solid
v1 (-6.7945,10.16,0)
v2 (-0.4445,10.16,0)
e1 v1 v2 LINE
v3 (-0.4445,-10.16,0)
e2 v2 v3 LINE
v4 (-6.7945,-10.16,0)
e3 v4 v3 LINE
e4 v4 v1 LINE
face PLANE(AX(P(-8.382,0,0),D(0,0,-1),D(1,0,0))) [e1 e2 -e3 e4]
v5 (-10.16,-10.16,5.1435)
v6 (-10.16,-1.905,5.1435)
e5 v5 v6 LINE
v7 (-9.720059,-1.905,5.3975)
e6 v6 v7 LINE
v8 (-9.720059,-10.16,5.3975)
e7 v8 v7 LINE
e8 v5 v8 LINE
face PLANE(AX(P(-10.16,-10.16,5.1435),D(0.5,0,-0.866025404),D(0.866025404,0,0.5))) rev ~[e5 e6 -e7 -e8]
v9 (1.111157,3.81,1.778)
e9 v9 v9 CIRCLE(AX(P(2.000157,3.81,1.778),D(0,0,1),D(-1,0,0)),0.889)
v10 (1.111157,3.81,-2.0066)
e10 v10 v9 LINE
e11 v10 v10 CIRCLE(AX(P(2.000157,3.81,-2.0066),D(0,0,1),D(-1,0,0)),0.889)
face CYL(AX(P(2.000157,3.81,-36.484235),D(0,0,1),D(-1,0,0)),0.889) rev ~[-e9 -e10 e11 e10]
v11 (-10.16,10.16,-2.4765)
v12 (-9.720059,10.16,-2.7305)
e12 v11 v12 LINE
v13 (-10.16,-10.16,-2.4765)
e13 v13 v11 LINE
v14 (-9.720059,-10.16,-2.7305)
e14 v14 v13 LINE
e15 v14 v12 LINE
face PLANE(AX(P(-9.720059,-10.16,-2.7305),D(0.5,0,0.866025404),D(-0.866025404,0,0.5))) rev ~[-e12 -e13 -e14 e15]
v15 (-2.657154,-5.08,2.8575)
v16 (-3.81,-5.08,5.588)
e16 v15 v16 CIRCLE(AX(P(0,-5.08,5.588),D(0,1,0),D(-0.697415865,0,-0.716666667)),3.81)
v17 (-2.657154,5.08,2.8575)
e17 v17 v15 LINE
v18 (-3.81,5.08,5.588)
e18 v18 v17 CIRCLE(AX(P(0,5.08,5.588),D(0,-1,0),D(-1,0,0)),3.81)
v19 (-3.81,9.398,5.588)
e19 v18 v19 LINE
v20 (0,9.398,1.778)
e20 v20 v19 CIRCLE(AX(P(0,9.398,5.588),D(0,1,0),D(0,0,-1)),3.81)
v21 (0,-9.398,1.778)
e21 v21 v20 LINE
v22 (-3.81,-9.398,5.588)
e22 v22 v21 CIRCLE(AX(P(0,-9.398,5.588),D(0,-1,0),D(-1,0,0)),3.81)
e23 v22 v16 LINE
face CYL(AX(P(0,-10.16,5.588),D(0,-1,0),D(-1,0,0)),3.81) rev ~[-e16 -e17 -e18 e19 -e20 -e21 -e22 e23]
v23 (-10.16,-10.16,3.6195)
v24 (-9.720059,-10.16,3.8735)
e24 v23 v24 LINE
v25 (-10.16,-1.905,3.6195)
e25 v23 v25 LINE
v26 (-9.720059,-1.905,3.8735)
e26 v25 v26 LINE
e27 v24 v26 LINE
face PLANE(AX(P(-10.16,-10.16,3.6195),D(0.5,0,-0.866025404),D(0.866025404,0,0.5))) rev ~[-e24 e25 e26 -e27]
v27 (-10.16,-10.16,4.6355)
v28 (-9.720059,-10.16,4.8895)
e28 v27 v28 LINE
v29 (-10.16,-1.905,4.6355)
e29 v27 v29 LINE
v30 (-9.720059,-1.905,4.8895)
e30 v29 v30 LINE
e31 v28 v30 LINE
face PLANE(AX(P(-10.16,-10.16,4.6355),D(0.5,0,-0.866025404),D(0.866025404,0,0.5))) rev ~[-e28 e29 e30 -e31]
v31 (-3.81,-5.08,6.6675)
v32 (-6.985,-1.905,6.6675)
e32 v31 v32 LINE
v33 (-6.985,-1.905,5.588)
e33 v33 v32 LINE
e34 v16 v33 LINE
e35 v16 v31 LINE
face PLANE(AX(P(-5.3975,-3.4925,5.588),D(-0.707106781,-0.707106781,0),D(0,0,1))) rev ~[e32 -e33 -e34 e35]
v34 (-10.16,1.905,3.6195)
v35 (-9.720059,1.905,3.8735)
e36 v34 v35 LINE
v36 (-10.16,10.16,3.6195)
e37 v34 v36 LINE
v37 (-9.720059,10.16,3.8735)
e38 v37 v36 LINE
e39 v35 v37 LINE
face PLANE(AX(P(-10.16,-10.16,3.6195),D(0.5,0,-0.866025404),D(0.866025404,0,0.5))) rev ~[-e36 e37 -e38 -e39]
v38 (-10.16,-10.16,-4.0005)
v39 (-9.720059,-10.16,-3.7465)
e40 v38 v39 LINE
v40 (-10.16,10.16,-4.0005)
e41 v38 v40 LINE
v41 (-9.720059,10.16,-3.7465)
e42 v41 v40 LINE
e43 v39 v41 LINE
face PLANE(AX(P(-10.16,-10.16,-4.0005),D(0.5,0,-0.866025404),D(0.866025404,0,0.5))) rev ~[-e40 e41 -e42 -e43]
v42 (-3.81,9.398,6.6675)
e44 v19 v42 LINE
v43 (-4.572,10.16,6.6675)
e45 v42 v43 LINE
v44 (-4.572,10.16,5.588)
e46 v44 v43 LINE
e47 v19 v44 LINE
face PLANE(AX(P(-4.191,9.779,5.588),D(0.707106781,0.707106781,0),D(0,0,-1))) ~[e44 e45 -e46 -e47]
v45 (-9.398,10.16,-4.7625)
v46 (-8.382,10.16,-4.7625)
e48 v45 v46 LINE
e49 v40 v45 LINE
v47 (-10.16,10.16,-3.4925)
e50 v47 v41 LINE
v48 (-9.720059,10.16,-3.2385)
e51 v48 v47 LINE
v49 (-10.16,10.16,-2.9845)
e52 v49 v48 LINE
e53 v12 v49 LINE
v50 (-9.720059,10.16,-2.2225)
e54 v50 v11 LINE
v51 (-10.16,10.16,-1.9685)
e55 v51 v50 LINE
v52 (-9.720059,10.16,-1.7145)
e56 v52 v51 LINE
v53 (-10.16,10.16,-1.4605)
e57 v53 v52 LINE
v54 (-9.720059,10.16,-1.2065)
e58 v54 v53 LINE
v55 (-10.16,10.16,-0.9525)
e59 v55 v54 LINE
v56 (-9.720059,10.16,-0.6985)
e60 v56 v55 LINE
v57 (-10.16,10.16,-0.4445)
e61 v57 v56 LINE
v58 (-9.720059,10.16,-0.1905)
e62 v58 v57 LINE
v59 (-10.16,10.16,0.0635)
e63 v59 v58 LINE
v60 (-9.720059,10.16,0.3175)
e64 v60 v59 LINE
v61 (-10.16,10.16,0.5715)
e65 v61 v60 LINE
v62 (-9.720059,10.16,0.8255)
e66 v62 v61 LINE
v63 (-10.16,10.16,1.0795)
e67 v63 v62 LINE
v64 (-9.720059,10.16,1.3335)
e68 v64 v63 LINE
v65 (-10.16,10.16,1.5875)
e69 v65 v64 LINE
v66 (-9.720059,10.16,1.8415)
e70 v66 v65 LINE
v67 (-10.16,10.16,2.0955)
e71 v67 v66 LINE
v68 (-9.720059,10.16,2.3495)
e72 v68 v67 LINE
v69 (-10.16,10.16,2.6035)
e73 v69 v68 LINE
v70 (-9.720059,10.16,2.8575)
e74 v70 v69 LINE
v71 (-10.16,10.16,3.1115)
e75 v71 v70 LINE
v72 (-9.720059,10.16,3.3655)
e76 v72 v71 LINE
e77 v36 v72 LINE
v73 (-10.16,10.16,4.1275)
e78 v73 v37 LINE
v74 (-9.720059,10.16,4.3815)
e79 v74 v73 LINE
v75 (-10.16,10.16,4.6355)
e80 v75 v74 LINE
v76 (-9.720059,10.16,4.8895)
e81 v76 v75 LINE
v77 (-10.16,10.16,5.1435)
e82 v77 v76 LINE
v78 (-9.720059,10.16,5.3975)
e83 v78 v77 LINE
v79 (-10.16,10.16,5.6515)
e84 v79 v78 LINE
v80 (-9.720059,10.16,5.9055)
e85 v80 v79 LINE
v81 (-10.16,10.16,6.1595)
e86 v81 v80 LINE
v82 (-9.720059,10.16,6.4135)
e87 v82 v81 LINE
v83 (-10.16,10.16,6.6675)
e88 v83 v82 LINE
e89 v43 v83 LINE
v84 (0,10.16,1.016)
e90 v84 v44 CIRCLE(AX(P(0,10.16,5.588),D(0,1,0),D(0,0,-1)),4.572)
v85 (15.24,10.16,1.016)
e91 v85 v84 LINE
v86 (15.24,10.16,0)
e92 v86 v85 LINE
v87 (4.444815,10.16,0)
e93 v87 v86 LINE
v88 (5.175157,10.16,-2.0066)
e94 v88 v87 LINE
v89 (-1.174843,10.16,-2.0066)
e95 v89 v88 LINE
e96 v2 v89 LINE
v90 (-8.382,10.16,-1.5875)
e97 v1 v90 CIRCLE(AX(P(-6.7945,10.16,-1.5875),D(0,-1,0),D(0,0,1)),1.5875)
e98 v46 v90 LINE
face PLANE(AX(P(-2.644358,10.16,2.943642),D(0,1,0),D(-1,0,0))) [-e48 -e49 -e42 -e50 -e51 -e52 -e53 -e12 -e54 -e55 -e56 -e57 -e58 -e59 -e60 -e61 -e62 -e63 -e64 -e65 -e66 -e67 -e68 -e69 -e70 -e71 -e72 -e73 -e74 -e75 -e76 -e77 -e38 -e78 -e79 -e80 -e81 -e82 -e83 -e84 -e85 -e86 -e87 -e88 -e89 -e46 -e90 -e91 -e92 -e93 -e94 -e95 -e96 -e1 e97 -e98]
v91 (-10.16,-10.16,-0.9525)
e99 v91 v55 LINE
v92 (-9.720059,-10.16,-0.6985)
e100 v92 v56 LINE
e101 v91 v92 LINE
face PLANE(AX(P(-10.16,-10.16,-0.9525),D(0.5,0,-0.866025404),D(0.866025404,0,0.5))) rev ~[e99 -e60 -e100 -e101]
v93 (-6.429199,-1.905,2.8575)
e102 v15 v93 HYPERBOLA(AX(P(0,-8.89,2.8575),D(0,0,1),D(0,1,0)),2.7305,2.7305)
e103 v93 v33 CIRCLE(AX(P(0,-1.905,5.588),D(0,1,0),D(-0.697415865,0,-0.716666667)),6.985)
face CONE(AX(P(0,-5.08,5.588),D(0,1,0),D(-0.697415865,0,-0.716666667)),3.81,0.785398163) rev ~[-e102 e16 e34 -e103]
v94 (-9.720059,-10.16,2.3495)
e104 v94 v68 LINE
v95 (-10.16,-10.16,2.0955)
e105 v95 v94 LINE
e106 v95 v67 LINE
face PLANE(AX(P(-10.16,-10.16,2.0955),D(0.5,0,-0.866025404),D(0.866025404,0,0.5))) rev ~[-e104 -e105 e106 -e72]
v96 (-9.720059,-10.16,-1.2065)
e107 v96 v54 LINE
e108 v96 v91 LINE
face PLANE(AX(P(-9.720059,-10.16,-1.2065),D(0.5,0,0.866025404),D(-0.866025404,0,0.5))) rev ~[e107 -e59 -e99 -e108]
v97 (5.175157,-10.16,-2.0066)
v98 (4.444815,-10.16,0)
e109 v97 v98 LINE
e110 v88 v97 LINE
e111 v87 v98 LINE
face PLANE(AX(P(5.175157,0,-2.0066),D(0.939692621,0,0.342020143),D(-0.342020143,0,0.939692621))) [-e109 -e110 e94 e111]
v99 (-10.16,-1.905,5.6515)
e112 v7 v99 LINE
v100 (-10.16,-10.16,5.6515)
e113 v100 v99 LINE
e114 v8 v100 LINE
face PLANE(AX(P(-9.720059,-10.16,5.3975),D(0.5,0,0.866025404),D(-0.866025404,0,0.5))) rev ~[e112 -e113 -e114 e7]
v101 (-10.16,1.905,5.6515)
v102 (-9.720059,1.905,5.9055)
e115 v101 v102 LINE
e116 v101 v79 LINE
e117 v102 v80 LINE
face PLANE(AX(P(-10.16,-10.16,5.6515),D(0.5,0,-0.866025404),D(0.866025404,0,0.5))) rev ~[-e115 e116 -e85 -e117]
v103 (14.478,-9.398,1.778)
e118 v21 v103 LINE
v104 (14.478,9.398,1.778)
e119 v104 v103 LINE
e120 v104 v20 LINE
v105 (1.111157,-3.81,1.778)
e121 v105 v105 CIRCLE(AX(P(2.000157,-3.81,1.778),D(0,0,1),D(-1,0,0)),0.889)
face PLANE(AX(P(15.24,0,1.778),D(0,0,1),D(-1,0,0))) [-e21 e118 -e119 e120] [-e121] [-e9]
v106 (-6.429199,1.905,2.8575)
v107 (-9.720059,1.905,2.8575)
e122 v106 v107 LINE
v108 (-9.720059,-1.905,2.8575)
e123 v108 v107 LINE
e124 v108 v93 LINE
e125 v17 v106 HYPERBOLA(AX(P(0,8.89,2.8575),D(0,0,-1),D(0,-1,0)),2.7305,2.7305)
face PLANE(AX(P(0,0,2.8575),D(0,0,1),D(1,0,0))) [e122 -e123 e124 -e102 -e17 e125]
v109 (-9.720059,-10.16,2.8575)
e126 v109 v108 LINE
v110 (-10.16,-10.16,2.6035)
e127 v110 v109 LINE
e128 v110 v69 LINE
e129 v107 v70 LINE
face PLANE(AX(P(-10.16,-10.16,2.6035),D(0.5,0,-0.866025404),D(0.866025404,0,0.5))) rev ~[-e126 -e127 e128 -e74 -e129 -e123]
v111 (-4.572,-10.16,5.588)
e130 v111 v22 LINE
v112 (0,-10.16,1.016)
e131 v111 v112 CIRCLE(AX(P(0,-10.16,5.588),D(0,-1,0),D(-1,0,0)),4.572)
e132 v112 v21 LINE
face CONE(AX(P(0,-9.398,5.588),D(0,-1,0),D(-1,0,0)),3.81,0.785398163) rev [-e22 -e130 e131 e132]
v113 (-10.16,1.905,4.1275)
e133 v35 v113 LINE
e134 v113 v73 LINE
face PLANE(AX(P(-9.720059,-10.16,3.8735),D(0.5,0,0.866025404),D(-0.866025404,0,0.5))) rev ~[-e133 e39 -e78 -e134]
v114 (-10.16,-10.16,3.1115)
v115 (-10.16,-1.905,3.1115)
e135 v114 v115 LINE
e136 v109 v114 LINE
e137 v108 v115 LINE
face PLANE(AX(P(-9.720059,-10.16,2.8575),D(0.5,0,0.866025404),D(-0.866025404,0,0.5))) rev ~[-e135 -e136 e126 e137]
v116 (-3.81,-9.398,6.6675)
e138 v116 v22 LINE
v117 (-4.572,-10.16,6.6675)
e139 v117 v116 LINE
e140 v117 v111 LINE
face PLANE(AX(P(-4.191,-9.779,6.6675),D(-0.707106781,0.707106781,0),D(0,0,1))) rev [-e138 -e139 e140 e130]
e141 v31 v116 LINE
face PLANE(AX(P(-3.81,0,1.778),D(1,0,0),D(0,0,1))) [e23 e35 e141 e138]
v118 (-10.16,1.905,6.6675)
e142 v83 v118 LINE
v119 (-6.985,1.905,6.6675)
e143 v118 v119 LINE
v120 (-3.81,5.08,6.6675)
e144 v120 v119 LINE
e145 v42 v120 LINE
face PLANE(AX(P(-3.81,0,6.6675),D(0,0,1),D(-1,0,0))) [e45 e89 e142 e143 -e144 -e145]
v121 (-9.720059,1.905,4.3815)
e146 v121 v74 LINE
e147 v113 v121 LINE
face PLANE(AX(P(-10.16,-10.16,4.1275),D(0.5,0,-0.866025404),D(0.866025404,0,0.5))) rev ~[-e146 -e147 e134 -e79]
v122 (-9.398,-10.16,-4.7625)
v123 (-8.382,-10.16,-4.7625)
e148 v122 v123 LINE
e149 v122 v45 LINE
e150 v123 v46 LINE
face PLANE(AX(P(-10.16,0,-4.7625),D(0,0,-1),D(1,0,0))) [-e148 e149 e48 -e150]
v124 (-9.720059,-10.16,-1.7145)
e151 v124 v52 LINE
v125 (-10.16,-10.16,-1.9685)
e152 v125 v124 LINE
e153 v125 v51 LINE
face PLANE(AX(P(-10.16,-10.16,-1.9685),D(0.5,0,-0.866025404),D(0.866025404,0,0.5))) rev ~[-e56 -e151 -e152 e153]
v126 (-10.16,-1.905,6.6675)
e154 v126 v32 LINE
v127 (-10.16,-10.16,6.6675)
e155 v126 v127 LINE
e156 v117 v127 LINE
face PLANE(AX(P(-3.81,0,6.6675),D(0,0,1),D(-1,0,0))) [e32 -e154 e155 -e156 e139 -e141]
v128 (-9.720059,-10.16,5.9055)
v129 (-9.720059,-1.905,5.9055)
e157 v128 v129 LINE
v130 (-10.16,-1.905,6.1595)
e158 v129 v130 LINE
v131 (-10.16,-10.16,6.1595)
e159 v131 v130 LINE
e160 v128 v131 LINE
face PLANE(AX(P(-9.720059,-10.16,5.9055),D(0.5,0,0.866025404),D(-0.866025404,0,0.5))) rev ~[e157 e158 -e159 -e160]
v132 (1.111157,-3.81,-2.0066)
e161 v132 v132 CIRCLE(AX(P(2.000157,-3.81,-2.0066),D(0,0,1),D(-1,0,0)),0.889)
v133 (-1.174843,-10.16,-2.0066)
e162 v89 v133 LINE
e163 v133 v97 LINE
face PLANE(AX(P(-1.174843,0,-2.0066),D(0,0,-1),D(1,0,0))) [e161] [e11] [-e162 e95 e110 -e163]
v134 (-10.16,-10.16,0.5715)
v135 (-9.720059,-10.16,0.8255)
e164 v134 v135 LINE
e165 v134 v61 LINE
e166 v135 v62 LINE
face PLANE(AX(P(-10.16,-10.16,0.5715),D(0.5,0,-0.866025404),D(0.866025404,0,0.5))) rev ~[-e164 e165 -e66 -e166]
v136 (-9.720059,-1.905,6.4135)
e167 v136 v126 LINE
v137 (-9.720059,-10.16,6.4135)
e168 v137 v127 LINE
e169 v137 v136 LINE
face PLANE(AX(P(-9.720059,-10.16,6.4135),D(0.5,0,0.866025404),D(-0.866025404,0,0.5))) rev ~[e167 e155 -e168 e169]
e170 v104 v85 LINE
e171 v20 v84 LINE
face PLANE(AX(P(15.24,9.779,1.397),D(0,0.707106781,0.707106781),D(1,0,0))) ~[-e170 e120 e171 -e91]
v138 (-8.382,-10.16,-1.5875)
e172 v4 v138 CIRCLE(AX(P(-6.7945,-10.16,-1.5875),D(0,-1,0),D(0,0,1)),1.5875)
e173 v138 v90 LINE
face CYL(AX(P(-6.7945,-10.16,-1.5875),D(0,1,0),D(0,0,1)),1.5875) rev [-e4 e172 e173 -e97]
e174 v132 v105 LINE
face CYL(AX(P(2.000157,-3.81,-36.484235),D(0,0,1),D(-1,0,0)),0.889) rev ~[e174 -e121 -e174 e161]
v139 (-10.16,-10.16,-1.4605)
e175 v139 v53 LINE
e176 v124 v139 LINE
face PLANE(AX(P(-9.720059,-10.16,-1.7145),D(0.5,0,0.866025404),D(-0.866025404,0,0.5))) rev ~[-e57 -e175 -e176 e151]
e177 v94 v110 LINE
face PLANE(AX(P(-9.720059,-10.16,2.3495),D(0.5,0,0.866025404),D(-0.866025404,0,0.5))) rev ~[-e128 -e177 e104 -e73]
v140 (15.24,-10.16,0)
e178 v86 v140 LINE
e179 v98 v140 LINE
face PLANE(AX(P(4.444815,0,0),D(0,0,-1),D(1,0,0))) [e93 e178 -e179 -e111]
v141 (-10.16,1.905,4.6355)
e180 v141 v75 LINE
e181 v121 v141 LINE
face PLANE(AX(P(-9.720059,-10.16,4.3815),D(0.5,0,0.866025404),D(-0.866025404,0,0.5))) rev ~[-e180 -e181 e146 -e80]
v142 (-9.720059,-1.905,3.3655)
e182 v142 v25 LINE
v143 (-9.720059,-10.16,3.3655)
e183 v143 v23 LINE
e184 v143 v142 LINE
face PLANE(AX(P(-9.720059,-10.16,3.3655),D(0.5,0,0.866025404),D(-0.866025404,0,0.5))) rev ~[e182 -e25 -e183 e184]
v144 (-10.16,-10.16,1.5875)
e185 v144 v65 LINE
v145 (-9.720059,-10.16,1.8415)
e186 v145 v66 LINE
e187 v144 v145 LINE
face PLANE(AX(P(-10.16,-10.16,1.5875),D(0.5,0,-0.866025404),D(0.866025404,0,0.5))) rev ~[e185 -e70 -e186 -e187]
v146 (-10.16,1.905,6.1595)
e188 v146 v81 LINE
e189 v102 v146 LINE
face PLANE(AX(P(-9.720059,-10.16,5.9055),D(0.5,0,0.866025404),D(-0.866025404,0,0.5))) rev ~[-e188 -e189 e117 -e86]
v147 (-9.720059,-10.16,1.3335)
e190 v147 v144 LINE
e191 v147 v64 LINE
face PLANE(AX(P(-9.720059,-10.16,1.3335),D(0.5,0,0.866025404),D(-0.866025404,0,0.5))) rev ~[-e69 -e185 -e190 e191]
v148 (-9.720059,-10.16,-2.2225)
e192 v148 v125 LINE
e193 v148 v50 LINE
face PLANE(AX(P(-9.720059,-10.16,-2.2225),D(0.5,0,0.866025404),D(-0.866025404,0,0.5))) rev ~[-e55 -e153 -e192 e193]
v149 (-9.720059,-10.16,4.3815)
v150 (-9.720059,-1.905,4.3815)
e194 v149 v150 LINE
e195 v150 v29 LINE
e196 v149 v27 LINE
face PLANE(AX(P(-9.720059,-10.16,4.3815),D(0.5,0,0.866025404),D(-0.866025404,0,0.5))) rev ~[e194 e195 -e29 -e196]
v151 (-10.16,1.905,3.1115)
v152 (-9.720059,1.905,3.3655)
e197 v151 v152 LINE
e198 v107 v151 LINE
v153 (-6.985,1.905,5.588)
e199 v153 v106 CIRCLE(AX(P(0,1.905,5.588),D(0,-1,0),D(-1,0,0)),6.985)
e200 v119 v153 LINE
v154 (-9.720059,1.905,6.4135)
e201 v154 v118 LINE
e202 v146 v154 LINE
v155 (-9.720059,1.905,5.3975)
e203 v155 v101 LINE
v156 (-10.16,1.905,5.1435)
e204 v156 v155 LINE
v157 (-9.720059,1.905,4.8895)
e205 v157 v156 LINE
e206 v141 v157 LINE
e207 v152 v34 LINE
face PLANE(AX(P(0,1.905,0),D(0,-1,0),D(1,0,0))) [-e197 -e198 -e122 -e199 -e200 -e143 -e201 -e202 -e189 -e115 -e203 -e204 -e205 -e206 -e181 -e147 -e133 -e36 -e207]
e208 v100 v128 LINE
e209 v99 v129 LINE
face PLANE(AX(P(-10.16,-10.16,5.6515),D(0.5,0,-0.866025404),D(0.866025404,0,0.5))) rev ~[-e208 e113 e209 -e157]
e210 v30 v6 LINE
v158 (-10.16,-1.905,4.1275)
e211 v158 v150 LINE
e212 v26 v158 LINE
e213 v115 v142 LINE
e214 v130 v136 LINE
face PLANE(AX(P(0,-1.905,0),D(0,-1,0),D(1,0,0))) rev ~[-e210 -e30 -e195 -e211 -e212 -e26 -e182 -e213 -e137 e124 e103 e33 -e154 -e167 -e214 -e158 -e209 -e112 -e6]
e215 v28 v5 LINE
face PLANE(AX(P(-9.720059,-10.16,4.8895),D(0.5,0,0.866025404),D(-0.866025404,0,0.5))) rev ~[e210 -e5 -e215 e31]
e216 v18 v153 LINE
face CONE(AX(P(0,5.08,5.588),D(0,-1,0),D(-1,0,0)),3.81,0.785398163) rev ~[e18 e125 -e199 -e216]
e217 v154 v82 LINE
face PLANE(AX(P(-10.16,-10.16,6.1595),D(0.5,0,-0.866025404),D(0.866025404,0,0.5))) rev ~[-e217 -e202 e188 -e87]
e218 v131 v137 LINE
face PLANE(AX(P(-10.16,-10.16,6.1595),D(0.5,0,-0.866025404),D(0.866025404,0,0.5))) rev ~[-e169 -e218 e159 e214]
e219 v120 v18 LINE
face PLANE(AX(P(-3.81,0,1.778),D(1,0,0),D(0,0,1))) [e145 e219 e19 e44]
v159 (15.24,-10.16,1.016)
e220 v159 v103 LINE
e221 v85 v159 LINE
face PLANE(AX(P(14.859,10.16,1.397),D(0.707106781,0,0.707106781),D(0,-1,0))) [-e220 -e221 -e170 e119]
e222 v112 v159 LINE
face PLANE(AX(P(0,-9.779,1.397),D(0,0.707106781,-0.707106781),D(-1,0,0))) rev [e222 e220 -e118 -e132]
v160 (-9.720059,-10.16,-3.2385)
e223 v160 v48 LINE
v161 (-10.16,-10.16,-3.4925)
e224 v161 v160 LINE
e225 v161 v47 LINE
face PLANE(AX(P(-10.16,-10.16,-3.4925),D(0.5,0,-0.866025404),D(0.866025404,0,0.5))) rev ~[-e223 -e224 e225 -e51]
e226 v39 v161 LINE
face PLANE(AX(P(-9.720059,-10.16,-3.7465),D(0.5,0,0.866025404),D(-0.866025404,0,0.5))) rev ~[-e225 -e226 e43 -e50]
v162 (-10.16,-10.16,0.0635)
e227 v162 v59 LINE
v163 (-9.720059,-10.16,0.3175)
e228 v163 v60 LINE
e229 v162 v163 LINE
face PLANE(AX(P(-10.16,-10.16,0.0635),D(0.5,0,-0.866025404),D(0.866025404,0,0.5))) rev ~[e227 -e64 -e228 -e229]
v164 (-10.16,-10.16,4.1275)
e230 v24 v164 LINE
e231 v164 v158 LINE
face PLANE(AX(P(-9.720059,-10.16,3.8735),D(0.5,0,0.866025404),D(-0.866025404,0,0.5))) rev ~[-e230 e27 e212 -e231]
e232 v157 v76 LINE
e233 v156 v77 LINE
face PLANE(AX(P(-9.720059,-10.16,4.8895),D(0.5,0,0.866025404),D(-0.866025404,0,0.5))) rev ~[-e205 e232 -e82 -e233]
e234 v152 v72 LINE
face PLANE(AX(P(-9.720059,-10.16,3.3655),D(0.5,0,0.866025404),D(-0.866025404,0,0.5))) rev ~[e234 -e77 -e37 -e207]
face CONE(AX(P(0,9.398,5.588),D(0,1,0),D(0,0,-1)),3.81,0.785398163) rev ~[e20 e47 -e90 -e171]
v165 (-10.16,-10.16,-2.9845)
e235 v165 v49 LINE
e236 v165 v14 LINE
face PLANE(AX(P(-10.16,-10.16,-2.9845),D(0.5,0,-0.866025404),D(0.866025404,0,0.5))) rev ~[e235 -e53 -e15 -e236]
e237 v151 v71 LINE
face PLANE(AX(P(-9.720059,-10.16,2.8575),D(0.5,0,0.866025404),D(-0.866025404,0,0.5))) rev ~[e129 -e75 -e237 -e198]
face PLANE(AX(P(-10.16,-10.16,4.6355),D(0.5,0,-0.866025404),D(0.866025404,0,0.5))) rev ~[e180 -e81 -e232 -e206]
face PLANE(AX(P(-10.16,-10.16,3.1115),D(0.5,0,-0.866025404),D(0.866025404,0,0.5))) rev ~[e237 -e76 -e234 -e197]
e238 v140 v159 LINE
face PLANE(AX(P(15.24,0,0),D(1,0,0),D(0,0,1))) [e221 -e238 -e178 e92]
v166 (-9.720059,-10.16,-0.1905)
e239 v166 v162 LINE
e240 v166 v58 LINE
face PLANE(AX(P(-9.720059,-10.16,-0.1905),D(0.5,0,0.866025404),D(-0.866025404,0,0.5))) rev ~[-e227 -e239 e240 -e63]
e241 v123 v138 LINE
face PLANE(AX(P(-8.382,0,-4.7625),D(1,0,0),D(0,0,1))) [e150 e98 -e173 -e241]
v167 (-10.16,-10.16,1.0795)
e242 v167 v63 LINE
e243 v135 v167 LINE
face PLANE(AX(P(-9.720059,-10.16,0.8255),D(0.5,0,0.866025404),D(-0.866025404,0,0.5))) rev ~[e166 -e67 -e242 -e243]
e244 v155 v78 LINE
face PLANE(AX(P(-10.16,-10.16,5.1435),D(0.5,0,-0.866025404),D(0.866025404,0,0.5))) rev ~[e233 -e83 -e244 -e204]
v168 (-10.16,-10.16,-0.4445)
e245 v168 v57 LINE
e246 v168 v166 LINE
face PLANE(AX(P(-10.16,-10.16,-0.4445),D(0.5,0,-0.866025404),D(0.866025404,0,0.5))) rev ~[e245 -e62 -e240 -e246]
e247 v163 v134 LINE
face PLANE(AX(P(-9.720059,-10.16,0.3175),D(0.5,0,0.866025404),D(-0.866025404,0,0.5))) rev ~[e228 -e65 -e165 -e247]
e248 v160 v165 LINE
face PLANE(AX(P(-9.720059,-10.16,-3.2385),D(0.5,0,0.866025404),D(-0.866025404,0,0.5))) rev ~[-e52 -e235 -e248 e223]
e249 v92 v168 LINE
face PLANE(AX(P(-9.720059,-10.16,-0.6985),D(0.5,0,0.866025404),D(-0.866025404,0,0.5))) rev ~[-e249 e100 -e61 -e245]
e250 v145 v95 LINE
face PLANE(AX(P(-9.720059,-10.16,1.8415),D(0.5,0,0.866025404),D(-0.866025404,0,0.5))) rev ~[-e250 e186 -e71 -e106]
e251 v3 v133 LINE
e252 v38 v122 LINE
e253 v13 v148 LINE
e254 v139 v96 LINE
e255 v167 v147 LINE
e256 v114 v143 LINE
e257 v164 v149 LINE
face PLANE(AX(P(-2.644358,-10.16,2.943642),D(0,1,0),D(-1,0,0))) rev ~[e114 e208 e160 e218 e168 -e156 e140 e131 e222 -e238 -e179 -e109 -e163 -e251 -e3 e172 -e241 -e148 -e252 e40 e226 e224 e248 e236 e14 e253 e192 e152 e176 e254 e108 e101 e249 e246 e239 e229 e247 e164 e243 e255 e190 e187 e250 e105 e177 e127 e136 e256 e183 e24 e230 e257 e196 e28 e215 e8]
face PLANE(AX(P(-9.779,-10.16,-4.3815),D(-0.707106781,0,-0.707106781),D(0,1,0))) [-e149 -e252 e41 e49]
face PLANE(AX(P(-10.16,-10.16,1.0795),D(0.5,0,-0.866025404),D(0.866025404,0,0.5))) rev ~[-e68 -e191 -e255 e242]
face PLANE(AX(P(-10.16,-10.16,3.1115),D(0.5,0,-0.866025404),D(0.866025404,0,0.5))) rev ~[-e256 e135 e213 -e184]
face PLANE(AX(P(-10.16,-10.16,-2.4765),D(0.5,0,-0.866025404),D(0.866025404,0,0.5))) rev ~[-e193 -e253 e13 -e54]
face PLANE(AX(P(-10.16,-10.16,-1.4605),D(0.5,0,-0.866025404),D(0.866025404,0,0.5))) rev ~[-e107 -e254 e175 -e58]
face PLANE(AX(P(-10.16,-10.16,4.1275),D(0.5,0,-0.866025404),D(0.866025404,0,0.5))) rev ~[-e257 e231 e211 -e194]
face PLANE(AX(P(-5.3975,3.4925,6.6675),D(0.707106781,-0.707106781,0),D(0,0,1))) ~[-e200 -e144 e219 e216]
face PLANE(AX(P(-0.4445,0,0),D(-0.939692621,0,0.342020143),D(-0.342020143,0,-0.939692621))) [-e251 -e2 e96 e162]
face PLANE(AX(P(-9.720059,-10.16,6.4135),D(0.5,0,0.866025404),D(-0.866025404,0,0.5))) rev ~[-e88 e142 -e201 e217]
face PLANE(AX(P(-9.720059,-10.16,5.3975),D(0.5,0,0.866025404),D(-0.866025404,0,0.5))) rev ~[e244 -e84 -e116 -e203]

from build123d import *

# Parameters (mm, degrees)
F1_DEPTH     = 10.16
F2_W         = 3.81
F2_H         = 3.81
F3_DEPTH     = 25.4
F4_R         = 1.5875
F5_T4_DEPTH  = 20.32
F5_T10_DEPTH = 20.32
F5_T16_DEPTH = 20.32
F5_T23_DEPTH = 20.32
F5_T29_DEPTH = 20.32
F6_SIZE      = 3.175
F7_SIZE      = 0.762
F8_SIZE      = 0.762
F10_D        = 1.778
F12_DEPTH    = 25.4


# Not quite as in the source:
# - a fillet or chamfer that OpenCascade refuses, or shapes differently, is made with other operations: its cross-section is extruded or revolved along the edge and cut away or added


with BuildPart() as f1:
    # F0 (on Front) → F1 (new body, symmetric)
    with BuildSketch(Plane.XZ):
        Polygon((-8.382, 0), (-0.4445, 0), (-1.1748426721, -2.0066), (5.1751573279, -2.0066), (4.4448146558, 0), (15.24, 0), (15.24, 1.778), (-3.81, 1.778), (-3.81, 6.6675), (-10.16, 6.6675), (-10.16, -4.7625), (-8.382, -4.7625), align=None)
    extrude(amount=F1_DEPTH, both=True)

    # F2 (on face) → F3 (cut)
    with BuildSketch(Plane(origin=(-10.16, 0, 0), x_dir=(0, -1, 0), z_dir=(-1, 0, 0))):
        with Locations((0, 4.7625)):
            Rectangle(F2_W, F2_H)
    extrude(amount=-F3_DEPTH, mode=Mode.SUBTRACT)

    # F4
    f4_edges = [f1.edges().sort_by_distance(p)[0] for p in [
        (-8.382, 0, 0),
    ]]
    fillet(f4_edges, radius=F4_R)

    # F5: fillet of radius 3.81 on 1 edges, made by hand


with BuildPart() as f5_tool2:
    # F5_s3 → F5_t4 (new body)
    with BuildSketch(Plane.XZ.offset(10.16)):
        with BuildLine():
            ThreePointArc((-3.81, 5.588), (-2.6940768363, 2.8939231637), (0, 1.778))
            Line((0, 1.778), (-3.81, 1.778))
            Line((-3.81, 1.778), (-3.81, 5.588))
        make_face()
    extrude(amount=-F5_T4_DEPTH)

    split(bisect_by=Plane.XZ.offset(1.905), keep=Keep.TOP)

    split(bisect_by=Plane.XY.offset(2.8575), keep=Keep.TOP)


with BuildPart() as f1_1:
    add(f1.part)

    # F5_t1: union F5_tool2
    add(f5_tool2.part)


with BuildPart() as f5_tool8:
    # F5_s9 → F5_t10 (new body)
    with BuildSketch(Plane.XZ.offset(10.16)):
        with BuildLine():
            ThreePointArc((-3.81, 5.588), (-2.6940768363, 2.8939231637), (0, 1.778))
            Line((0, 1.778), (-3.81, 1.778))
            Line((-3.81, 1.778), (-3.81, 5.588))
        make_face()
    extrude(amount=-F5_T10_DEPTH)

    split(bisect_by=Plane.XZ.offset(1.905), keep=Keep.TOP)

    split(bisect_by=Plane.XY.offset(2.8575), keep=Keep.BOTTOM)


with BuildPart() as f1_2:
    add(f1_1.part)

    # F5_t7: union F5_tool8
    add(f5_tool8.part)


with BuildPart() as f5_tool14:
    # F5_s15 → F5_t16 (new body)
    with BuildSketch(Plane.XZ.offset(10.16)):
        with BuildLine():
            ThreePointArc((-3.81, 5.588), (-2.6940768363, 2.8939231637), (0, 1.778))
            Line((0, 1.778), (-3.81, 1.778))
            Line((-3.81, 1.778), (-3.81, 5.588))
        make_face()
    extrude(amount=-F5_T16_DEPTH)

    split(bisect_by=Plane.XZ.offset(1.905), keep=Keep.BOTTOM)

    split(bisect_by=Plane.XY.offset(2.8575), keep=Keep.BOTTOM)

    split(bisect_by=Plane.XZ.offset(-1.905), keep=Keep.TOP)


with BuildPart() as f1_3:
    add(f1_2.part)

    # F5_t13: union F5_tool14
    add(f5_tool14.part)


with BuildPart() as f5_tool21:
    # F5_s22 → F5_t23 (new body)
    with BuildSketch(Plane.XZ.offset(10.16)):
        with BuildLine():
            ThreePointArc((-3.81, 5.588), (-2.6940768363, 2.8939231637), (0, 1.778))
            Line((0, 1.778), (-3.81, 1.778))
            Line((-3.81, 1.778), (-3.81, 5.588))
        make_face()
    extrude(amount=-F5_T23_DEPTH)

    split(bisect_by=Plane.XY.offset(2.8575), keep=Keep.TOP)

    split(bisect_by=Plane.XZ.offset(-1.905), keep=Keep.BOTTOM)


with BuildPart() as f1_4:
    add(f1_3.part)

    # F5_t20: union F5_tool21
    add(f5_tool21.part)


with BuildPart() as f5_tool27:
    # F5_s28 → F5_t29 (new body)
    with BuildSketch(Plane.XZ.offset(10.16)):
        with BuildLine():
            ThreePointArc((-3.81, 5.588), (-2.6940768363, 2.8939231637), (0, 1.778))
            Line((0, 1.778), (-3.81, 1.778))
            Line((-3.81, 1.778), (-3.81, 5.588))
        make_face()
    extrude(amount=-F5_T29_DEPTH)

    split(bisect_by=Plane.XY.offset(2.8575), keep=Keep.BOTTOM)

    split(bisect_by=Plane.XZ.offset(-1.905), keep=Keep.BOTTOM)


with BuildPart() as f1_5:
    add(f1_4.part)

    # F5_t26: union F5_tool27
    add(f5_tool27.part)

    # F6
    f6_edges = [f1_5.edges().sort_by_distance(p)[0] for p in [
        (-3.509976, -1.905, 4.106052),
        (-3.509976, 1.905, 4.106052),
    ]]
    chamfer(f6_edges, length=F6_SIZE)

    # F7
    f7_edges = [f1_5.edges().sort_by_distance(p)[0] for p in [
        (-10.16, 0, -4.7625),
    ]]
    chamfer(f7_edges, length=F7_SIZE)

    # F8
    f8_edges = [f1_5.edges().sort_by_distance(p)[0] for p in [
        (-2.694077, -10.16, 2.893923),
        (7.62, -10.16, 1.778),
        (7.62, 10.16, 1.778),
        (15.24, 0, 1.778),
    ]]
    chamfer(f8_edges, length=F8_SIZE)

    # F10 (through all)
    with Locations(Plane(origin=(0, 0, -2.0066), x_dir=(1, 0, 0), z_dir=(0, 0, -1))):
        with Locations((2.0001573279, 3.81), (2.0001573279, -3.81)):
            Hole(F10_D / 2)

    # F11 (on face) → F12 (cut)
    with BuildSketch(Plane.XZ.offset(10.16)):
        Polygon((-10.16, -3.4925), (-10.16, -4.0005), (-9.7200590949, -3.7465), align=None)
        Polygon((-10.16, -2.9845), (-10.16, -3.4925), (-9.7200590949, -3.2385), align=None)
        Polygon((-10.16, -2.4765), (-10.16, -2.9845), (-9.7200590949, -2.7305), align=None)
        Polygon((-9.7200590949, -2.2225), (-10.16, -1.9685), (-10.16, -2.4765), align=None)
        Polygon((-9.7200590949, -1.7145), (-10.16, -1.4605), (-10.16, -1.9685), align=None)
        Polygon((-9.7200590949, -1.2065), (-10.16, -0.9525), (-10.16, -1.4605), align=None)
        Polygon((-9.7200590949, -0.6985), (-10.16, -0.4445), (-10.16, -0.9525), align=None)
        Polygon((-9.7200590949, -0.1905), (-10.16, 0.0635), (-10.16, -0.4445), align=None)
        Polygon((-9.7200590949, 0.3175), (-10.16, 0.5715), (-10.16, 0.0635), align=None)
        Polygon((-9.7200590949, 0.8255), (-10.16, 1.0795), (-10.16, 0.5715), align=None)
        Polygon((-9.7200590949, 1.3335), (-10.16, 1.5875), (-10.16, 1.0795), align=None)
        Polygon((-9.7200590949, 1.8415), (-10.16, 2.0955), (-10.16, 1.5875), align=None)
        Polygon((-9.7200590949, 2.3495), (-10.16, 2.6035), (-10.16, 2.0955), align=None)
        Polygon((-9.7200590949, 2.8575), (-10.16, 3.1115), (-10.16, 2.6035), align=None)
        Polygon((-9.7200590949, 3.3655), (-10.16, 3.6195), (-10.16, 3.1115), align=None)
        Polygon((-9.7200590949, 3.8735), (-10.16, 4.1275), (-10.16, 3.6195), align=None)
        Polygon((-9.7200590949, 4.3815), (-10.16, 4.6355), (-10.16, 4.1275), align=None)
        Polygon((-9.7200590949, 4.8895), (-10.16, 5.1435), (-10.16, 4.6355), align=None)
        Polygon((-9.7200590949, 5.3975), (-10.16, 5.6515), (-10.16, 5.1435), align=None)
        Polygon((-9.7200590949, 5.9055), (-10.16, 6.1595), (-10.16, 5.6515), align=None)
        Polygon((-10.16, 6.1595), (-9.7200590949, 6.4135), (-10.16, 6.6675), align=None)
    extrude(amount=-F12_DEPTH, mode=Mode.SUBTRACT)


solid = f1_5.part
